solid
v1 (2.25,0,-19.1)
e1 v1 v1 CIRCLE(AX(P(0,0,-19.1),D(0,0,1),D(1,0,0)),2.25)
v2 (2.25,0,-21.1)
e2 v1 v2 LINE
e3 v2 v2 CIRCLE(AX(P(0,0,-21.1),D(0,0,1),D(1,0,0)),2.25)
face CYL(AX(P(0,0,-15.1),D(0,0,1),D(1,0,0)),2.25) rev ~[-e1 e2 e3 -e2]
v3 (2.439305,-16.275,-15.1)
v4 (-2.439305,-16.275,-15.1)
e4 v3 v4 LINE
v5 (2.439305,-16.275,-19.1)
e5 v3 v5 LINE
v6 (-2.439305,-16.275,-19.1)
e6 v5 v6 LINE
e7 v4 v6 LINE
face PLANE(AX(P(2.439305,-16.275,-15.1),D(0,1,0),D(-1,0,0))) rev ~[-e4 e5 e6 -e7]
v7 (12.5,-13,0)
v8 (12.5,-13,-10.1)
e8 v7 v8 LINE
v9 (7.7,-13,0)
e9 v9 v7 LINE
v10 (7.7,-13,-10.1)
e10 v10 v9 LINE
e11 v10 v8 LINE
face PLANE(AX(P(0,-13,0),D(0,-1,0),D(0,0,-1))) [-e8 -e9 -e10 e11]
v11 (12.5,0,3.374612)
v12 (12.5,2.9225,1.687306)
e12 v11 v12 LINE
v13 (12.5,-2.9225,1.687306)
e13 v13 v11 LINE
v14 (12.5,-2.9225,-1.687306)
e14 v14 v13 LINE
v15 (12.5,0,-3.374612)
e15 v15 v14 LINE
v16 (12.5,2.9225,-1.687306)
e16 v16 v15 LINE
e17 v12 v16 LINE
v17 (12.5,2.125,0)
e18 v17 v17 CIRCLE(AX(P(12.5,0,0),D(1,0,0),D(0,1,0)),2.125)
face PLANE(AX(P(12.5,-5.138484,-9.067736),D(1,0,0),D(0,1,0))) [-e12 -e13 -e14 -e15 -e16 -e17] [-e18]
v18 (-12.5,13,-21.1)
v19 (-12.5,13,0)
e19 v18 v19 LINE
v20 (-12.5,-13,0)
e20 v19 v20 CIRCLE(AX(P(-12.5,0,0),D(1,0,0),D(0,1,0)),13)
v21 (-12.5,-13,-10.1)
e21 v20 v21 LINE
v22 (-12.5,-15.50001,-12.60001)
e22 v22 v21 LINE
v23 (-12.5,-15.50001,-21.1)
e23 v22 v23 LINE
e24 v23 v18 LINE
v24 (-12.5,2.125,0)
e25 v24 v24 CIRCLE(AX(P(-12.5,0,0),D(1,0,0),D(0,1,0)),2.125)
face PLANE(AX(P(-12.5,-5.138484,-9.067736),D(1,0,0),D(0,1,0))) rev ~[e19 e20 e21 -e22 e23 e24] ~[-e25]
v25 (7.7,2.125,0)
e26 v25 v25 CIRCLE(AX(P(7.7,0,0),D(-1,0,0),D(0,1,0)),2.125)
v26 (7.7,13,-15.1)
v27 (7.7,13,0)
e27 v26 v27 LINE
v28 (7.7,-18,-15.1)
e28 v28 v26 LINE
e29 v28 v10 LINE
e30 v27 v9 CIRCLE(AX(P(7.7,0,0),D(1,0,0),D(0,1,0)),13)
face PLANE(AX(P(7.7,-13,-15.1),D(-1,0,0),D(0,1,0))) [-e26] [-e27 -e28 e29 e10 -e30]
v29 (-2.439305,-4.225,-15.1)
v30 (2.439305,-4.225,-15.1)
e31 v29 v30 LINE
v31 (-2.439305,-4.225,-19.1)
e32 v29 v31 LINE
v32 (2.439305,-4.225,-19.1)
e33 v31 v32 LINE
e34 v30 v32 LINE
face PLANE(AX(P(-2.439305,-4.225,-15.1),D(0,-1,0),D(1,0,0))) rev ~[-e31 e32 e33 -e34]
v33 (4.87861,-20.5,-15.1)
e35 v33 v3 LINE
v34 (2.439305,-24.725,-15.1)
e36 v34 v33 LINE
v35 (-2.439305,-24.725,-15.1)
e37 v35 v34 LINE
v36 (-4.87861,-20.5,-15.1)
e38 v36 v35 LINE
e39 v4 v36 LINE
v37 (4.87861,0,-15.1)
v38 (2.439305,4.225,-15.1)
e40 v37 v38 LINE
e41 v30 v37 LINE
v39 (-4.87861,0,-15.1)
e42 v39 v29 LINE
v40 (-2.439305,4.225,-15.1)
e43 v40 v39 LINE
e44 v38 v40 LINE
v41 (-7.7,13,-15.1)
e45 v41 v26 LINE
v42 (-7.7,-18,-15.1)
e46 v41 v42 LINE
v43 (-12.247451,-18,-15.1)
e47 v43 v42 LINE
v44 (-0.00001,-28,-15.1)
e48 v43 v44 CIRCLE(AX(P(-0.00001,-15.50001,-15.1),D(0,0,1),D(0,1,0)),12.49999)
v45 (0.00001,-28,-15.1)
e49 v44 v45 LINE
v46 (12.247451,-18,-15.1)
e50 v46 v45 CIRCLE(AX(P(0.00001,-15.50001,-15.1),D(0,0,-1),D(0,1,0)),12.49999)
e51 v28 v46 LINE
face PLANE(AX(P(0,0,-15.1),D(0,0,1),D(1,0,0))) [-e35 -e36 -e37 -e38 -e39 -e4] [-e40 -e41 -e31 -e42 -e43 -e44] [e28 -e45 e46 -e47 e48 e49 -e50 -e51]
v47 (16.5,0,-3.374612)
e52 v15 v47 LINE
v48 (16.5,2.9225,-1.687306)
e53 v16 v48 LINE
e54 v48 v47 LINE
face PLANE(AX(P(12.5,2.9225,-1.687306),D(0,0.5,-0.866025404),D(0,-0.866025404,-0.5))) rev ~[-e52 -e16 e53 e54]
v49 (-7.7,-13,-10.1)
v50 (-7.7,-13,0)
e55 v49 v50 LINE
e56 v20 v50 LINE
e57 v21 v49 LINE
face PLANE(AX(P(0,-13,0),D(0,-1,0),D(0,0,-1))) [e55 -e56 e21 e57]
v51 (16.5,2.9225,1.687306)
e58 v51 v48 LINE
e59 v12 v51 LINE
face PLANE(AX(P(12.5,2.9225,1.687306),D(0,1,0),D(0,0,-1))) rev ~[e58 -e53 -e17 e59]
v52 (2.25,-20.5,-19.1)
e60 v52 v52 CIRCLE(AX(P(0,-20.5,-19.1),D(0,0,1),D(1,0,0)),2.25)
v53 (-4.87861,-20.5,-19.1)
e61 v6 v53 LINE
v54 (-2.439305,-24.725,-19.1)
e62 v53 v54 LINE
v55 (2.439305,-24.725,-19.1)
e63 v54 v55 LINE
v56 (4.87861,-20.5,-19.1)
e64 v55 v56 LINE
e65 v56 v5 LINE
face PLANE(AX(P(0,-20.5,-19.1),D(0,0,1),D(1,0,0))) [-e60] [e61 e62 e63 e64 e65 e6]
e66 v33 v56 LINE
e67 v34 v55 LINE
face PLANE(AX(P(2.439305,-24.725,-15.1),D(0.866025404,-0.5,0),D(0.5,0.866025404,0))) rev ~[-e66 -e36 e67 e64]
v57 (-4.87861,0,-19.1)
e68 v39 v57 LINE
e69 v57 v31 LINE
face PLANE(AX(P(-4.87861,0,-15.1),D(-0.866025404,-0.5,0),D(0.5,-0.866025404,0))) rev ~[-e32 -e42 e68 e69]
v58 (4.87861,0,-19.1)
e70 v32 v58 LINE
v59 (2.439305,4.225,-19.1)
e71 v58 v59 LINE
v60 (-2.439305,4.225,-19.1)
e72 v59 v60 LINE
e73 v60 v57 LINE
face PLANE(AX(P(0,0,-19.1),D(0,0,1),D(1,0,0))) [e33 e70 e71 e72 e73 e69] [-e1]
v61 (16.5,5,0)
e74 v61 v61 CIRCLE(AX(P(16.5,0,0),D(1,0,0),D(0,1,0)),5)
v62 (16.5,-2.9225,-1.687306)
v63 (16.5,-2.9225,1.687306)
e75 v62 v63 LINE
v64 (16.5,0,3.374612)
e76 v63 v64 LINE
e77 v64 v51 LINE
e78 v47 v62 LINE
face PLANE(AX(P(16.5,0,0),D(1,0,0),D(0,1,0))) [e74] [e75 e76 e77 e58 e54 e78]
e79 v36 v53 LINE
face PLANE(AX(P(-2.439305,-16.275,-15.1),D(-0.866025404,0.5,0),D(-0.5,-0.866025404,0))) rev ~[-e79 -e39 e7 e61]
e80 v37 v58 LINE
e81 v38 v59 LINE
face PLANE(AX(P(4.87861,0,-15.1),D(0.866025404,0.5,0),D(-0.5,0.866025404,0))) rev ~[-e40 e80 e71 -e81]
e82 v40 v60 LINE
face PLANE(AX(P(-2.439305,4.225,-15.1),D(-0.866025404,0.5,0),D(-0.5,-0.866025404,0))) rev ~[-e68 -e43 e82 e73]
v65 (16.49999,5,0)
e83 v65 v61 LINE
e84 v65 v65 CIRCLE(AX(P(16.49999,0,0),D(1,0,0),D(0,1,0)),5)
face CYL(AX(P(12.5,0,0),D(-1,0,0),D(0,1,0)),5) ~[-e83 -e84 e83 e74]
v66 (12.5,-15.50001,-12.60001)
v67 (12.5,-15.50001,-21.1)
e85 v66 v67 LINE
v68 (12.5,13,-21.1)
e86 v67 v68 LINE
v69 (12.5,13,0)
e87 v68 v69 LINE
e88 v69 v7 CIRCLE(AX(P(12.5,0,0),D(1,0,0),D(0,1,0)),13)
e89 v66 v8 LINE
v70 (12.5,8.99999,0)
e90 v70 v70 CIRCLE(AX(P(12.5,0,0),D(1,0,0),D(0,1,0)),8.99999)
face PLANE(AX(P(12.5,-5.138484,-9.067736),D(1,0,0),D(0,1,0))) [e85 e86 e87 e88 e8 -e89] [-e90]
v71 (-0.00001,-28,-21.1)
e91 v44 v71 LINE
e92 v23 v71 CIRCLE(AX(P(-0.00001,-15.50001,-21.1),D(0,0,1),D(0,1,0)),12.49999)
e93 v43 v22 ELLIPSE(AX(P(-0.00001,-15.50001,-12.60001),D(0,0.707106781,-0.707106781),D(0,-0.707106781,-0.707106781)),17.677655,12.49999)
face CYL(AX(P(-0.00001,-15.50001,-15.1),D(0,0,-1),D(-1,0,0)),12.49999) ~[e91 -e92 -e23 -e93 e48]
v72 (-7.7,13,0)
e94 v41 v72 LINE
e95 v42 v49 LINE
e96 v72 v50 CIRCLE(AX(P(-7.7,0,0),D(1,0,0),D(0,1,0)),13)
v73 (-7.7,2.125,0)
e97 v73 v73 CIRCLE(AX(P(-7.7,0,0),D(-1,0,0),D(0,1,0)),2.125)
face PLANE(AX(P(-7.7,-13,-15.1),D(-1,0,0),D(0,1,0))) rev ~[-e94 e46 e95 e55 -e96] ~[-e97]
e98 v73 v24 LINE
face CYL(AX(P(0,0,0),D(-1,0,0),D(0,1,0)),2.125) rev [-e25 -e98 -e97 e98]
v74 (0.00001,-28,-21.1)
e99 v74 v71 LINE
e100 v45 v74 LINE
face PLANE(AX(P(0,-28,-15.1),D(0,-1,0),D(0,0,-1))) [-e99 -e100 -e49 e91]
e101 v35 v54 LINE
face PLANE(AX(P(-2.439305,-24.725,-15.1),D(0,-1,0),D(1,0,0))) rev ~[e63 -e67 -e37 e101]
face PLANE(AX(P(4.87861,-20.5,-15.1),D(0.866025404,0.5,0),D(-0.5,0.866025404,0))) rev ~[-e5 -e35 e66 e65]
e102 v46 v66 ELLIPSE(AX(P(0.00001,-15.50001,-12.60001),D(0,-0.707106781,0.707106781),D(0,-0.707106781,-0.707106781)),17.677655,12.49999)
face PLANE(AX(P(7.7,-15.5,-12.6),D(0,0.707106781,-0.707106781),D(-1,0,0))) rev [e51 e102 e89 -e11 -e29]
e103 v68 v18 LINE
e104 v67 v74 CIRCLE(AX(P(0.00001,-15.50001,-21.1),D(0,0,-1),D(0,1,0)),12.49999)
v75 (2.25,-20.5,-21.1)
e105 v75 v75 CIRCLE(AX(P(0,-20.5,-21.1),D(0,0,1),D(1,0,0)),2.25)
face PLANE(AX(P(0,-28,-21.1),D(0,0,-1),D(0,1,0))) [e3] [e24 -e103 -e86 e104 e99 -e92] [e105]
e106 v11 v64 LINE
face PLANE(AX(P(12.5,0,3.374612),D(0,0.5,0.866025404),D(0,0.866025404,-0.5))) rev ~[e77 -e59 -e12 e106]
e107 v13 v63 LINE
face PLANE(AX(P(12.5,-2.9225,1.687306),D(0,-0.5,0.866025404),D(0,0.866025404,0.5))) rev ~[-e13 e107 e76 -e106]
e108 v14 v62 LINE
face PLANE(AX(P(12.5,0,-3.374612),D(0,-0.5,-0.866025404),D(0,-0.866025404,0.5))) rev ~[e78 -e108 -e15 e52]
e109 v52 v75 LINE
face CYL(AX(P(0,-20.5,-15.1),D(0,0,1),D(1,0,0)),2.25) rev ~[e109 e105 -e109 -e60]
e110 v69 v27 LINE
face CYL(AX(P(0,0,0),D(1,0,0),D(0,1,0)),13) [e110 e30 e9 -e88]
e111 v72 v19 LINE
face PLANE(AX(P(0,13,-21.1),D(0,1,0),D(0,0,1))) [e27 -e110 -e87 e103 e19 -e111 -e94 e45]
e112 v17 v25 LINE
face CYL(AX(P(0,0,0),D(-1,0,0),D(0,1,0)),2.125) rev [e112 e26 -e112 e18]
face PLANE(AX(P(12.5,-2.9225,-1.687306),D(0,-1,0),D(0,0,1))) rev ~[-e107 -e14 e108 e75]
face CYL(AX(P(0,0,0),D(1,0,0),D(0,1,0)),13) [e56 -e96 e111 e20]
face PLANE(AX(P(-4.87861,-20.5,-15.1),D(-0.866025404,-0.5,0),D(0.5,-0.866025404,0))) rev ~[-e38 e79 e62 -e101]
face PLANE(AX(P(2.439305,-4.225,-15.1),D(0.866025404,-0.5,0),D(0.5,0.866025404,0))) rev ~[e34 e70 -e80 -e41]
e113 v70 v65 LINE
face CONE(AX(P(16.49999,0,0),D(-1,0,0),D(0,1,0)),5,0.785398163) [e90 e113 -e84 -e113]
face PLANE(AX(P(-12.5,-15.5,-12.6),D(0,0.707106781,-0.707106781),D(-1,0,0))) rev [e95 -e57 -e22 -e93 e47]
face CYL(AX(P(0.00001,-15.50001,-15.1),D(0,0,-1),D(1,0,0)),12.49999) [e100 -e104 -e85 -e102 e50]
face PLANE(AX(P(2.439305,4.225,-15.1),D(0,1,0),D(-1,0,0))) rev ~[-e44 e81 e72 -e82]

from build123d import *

# Parameters (mm, degrees)
F0_R      = 2.125
F1_DEPTH  = 12.5
F2_W      = 15.4
F2_H      = 26
F3_DEPTH  = 28.101
F4_R      = 2.25
F5_DEPTH  = 25
F7_DEPTH  = 4
F8_R      = 12.49999
F9_SIZE   = 5
F10_R     = 5
F11_DEPTH = 4
F12_SIZE  = 3.99999


# Not quite as in the source:
# - a fillet or chamfer is up to 0.001 mm smaller than in the source, because OpenCascade refuses the exact size
# - a feature names something its author has since deleted; it is built from what else it names


with BuildPart() as f1:
    # F0 (on Right) → F1 (new body, symmetric)
    with BuildSketch(Plane.YZ):
        with BuildLine():
            Line((13, -15.1), (13, 0))
            ThreePointArc((13, 0), (0, 13), (-13, 0))
            Line((-13, 0), (-13, -15.1))
            Line((-13, -15.1), (-28, -15.1))
            Line((-28, -15.1), (-28, -21.1))
            Line((-28, -21.1), (0, -21.1))
            Line((0, -21.1), (13, -21.1))
            Line((13, -21.1), (13, -15.1))
        make_face()
        Circle(F0_R, mode=Mode.SUBTRACT)
    extrude(amount=F1_DEPTH, both=True)

    # F2 (on face) → F3 (cut, through all)
    with BuildSketch(Plane.XY.offset(-15.1)):
        Rectangle(F2_W, F2_H)
    extrude(amount=F3_DEPTH, mode=Mode.SUBTRACT)

    # F4 (on face) → F5 (cut)
    with BuildSketch(Plane.XY.offset(-15.1)):
        with Locations((0, -20.5)):
            Circle(F4_R)
        Circle(F4_R)
    extrude(amount=-F5_DEPTH, mode=Mode.SUBTRACT)

    # F6 (on face) → F7 (cut)
    with BuildSketch(Plane.XY.offset(-15.1)):
        Polygon((-4.8786097747, -20.5), (-2.4393048873, -24.725), (2.4393048873, -24.725), (4.8786097747, -20.5), (2.4393048873, -16.275), (-2.4393048873, -16.275), align=None)
        Polygon((2.4393048873, 4.225), (-2.4393048873, 4.225), (-4.8786097747, 0), (-2.4393048873, -4.225), (2.4393048873, -4.225), (4.8786097747, 0), align=None)
    extrude(amount=-F7_DEPTH, mode=Mode.SUBTRACT)

    # F8 (radius 12.5 in the source; OpenCascade refuses exactly that, so slightly less here)
    f8_edges = [f1.edges().sort_by_distance(p)[0] for p in [
        (-12.5, -28, -18.1),
        (12.5, -28, -18.1),
    ]]
    fillet(f8_edges, radius=F8_R)

    # F9
    f9_edges = [f1.edges().sort_by_distance(p)[0] for p in [
        (-10.1, -13, -15.1),
        (10.1, -13, -15.1),
        (10.1, 13, 0),
        (-10.1, 13, 0),
    ]]
    chamfer(f9_edges, length=F9_SIZE)

    # F10 (on face) → F11 (join)
    with BuildSketch(Plane.YZ.offset(12.5)):
        Circle(F10_R)
        Polygon((0, 3.3746123234), (2.9225, 1.6873061617), (2.9225, -1.6873061617), (0, -3.3746123234), (-2.9225, -1.6873061617), (-2.9225, 1.6873061617), align=None, mode=Mode.SUBTRACT)
    extrude(amount=F11_DEPTH)

    # F12 (size 4 in the source; OpenCascade refuses exactly that, so slightly less here)
    f12_edges = [f1.edges().sort_by_distance(p)[0] for p in [
        (12.5, -5, 0),
    ]]
    chamfer(f12_edges, length=F12_SIZE)


solid = f1.part
